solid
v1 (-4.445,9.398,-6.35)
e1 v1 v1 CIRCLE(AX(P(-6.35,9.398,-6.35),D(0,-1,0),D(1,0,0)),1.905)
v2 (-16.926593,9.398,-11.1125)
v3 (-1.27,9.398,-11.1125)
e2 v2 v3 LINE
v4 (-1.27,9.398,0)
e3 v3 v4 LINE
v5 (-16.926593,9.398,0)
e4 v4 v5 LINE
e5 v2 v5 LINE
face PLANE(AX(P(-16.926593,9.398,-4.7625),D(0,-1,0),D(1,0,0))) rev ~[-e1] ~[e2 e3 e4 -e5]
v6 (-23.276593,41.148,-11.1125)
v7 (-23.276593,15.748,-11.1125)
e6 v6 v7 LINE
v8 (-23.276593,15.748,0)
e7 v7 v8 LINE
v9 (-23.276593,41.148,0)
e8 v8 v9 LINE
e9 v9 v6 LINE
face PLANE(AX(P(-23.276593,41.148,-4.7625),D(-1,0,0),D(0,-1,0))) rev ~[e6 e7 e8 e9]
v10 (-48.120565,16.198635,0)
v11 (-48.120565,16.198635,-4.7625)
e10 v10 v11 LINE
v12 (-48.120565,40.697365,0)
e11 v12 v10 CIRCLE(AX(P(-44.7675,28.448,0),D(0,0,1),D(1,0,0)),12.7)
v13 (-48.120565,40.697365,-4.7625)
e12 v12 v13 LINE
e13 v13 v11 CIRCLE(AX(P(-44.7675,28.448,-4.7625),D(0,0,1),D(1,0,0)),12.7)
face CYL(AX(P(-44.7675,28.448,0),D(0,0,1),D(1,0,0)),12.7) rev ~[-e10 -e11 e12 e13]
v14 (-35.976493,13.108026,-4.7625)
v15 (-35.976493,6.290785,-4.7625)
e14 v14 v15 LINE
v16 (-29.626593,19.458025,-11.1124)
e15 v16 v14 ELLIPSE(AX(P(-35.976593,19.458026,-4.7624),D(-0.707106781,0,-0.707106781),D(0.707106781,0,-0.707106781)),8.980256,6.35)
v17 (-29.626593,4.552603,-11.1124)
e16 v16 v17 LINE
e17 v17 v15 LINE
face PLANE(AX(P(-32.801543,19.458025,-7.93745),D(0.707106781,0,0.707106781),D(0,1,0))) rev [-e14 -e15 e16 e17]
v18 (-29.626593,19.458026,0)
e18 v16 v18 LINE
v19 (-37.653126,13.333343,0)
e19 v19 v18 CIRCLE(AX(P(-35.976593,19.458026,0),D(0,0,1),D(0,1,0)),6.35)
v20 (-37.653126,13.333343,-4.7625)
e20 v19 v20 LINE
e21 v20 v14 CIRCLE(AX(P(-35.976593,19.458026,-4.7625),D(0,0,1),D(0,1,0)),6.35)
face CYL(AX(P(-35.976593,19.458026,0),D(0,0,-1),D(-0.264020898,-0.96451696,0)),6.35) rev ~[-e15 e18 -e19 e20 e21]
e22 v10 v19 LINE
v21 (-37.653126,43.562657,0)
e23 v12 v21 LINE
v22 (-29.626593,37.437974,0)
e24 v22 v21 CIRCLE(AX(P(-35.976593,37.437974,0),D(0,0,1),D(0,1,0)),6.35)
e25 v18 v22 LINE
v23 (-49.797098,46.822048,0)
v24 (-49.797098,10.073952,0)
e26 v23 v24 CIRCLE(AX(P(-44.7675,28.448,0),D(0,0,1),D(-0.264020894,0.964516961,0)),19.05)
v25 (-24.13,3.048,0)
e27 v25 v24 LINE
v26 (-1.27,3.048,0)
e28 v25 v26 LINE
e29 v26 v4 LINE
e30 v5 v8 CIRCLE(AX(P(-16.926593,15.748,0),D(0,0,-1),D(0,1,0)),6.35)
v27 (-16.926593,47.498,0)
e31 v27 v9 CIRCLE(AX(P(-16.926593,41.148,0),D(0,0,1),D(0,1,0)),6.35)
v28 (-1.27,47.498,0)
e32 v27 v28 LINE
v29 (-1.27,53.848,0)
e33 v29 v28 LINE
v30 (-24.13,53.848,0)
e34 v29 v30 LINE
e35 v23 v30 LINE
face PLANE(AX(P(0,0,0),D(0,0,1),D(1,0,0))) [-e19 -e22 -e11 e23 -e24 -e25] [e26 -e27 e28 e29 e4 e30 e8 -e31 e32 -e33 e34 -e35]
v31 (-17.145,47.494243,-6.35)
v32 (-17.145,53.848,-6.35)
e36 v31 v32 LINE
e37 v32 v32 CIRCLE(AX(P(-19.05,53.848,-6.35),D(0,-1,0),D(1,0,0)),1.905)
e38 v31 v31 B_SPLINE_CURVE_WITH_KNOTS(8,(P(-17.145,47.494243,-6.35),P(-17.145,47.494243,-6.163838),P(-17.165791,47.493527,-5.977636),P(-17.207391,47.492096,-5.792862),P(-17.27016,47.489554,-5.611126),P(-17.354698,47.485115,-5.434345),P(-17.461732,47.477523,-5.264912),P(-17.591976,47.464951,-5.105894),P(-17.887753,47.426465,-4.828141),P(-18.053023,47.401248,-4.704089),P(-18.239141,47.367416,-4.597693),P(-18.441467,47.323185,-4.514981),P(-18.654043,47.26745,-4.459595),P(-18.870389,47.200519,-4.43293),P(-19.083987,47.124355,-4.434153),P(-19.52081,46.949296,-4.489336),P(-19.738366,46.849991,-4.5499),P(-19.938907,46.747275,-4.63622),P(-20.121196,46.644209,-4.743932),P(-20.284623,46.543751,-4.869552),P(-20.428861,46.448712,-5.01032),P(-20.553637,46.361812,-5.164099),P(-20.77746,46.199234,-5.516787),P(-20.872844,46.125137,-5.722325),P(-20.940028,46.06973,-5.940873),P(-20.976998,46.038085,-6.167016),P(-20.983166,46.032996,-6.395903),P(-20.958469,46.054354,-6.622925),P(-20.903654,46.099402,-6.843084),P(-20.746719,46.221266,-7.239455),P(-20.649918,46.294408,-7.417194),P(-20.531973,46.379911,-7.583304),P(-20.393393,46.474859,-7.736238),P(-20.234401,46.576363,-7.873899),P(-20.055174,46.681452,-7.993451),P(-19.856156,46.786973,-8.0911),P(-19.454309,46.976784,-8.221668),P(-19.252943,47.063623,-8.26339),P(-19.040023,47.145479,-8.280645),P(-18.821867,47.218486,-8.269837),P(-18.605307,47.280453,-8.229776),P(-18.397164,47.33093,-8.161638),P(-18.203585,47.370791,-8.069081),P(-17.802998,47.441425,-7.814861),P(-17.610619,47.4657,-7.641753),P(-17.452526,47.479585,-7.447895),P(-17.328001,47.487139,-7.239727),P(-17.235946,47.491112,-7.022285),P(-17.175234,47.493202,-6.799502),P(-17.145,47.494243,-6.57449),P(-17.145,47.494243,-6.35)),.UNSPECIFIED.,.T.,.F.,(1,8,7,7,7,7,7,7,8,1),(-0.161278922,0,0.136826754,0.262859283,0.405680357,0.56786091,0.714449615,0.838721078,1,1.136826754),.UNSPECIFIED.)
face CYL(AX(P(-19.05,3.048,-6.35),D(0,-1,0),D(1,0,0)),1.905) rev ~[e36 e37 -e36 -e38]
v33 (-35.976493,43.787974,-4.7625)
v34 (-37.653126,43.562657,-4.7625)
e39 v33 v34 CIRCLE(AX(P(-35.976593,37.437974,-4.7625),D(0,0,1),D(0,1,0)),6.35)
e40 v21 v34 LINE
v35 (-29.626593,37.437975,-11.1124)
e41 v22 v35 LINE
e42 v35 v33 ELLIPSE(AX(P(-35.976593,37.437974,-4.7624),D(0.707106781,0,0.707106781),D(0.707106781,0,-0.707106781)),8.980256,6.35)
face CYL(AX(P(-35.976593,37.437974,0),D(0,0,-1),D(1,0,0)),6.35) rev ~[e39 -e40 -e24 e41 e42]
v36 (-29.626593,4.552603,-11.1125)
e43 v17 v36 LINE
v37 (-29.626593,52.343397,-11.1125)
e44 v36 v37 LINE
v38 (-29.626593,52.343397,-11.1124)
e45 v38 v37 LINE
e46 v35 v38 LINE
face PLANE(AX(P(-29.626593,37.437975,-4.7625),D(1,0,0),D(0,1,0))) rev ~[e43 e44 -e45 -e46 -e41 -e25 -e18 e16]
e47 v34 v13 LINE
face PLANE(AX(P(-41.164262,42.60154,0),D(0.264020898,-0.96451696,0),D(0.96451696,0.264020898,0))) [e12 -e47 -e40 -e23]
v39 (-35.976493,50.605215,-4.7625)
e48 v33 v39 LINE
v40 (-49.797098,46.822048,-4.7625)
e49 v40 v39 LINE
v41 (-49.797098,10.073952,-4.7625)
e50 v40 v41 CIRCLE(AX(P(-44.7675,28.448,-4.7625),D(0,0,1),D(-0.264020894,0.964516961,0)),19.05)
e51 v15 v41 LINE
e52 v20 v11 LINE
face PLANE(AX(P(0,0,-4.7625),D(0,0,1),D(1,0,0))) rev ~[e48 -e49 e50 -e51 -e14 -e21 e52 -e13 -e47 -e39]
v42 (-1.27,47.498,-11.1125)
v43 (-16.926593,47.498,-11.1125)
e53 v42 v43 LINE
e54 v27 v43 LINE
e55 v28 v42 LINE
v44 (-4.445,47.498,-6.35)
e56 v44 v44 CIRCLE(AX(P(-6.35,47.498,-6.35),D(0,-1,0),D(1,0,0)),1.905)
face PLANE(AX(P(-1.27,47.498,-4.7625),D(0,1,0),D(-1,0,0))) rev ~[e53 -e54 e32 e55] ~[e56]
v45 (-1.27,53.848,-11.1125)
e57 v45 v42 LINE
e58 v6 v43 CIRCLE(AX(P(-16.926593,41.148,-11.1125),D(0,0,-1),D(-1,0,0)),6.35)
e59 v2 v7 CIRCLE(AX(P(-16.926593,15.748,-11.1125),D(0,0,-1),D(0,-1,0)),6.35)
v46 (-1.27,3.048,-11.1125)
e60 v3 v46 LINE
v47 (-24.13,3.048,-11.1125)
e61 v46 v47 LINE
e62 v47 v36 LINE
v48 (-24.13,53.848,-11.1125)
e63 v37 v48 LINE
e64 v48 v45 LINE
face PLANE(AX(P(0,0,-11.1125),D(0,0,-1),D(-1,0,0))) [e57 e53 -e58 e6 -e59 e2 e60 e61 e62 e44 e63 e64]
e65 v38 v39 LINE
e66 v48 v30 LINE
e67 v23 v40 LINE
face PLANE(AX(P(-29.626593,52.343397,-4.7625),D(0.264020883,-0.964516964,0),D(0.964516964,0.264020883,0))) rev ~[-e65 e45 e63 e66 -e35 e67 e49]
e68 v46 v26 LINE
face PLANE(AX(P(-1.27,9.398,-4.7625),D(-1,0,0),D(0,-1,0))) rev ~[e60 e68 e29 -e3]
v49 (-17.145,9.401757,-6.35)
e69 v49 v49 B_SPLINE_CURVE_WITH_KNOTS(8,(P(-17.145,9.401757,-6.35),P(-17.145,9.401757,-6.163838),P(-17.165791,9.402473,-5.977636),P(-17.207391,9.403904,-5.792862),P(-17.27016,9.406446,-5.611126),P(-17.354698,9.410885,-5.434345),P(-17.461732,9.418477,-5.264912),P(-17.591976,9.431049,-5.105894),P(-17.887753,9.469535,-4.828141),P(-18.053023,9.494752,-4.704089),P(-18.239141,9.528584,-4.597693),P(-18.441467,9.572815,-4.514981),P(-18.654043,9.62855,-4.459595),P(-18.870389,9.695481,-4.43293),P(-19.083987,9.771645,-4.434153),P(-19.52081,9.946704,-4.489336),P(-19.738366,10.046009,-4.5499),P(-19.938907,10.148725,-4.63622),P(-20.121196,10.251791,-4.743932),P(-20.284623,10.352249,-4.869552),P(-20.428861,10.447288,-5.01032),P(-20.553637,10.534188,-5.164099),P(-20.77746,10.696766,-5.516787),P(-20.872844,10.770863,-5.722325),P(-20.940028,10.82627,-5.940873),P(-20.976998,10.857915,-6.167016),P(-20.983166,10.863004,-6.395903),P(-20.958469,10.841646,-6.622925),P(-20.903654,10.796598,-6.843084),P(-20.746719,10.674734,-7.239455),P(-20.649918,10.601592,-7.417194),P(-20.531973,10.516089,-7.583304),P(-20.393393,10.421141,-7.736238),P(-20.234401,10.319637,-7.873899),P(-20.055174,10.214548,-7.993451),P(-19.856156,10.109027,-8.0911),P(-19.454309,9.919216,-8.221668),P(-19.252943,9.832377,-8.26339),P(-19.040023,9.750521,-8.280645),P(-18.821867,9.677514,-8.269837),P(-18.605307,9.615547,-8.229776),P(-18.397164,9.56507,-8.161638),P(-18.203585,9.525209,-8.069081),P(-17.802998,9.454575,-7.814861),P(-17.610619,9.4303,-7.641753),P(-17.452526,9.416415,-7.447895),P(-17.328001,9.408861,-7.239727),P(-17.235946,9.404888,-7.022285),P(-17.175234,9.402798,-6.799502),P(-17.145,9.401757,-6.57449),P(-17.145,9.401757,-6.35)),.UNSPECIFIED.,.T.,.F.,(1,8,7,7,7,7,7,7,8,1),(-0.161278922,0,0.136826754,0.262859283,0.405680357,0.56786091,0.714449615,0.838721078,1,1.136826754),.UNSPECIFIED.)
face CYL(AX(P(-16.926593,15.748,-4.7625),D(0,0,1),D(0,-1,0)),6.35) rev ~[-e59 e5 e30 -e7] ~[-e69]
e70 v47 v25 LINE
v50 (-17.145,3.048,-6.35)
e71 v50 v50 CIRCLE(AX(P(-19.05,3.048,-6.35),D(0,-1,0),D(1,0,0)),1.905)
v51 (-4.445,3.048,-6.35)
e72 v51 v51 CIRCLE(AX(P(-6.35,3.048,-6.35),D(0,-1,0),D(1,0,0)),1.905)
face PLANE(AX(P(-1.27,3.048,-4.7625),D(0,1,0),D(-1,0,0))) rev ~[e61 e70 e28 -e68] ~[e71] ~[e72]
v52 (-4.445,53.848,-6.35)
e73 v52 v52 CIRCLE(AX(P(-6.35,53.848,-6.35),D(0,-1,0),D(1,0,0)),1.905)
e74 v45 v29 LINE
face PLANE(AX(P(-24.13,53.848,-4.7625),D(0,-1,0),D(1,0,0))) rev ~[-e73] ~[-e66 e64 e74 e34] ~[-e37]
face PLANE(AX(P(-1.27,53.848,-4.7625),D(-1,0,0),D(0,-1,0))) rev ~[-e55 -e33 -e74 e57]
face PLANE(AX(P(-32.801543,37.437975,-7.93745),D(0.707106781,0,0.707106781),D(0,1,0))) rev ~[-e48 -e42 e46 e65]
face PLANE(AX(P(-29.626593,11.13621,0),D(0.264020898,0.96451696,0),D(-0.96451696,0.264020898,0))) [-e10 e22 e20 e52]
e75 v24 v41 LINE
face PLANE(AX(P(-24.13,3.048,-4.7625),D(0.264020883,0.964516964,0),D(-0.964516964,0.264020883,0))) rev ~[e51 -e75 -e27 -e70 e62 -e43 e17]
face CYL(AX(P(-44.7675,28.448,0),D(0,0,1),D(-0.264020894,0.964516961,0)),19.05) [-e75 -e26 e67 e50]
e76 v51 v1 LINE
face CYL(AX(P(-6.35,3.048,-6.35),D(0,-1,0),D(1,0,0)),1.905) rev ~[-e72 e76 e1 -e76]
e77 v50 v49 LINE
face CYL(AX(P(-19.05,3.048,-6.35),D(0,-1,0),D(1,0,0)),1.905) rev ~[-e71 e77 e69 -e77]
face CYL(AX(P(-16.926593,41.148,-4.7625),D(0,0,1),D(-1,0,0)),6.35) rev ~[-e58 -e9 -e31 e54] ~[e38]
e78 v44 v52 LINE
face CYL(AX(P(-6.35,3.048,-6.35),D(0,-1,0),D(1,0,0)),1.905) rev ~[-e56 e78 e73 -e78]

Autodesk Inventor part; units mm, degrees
ref_plane "YZ Plane" through (0, 0, 0) normal (1, 0, 0) x (0, 1, 0)
ref_plane "XZ Plane" through (0, 0, 0) normal (0, 1, 0) x (-1, 0, 0)
ref_plane "XY Plane" through (0, 0, 0) normal (0, 0, 1) x (1, 0, 0)
sketch "Sketch2" plane through (0, 0, 0) normal (0, 0, 1) x (1, 0, 0)
  arc A0 (-42.61997, 14.00175) -> (-42.61997, 42.89425) centre (-44.7675, 28.448) ccw
  line L0 (-19.05, 53.848) -> (-6.35, 53.848)
  line L1 (-6.35, 3.048) -> (-19.05, 3.048)
  line L2 (-8.255, 3.048) -> (-4.445, 3.048)
  line L3 (-20.955, 3.048) -> (-17.145, 3.048)
  line L4 (-4.445, 53.848) -> (-8.255, 53.848)
  line L5 (-17.145, 53.848) -> (-20.955, 53.848)
  circle A1 centre (-44.7675, 28.448) radius 12.7
  arc A2 (-49.797098, 46.822048) -> (-49.797098, 10.073952) centre (-44.7675, 28.448) ccw
  line L6 (-24.13, 3.048) -> (-49.797098, 10.073952)
  line L7 (-49.797098, 46.822048) -> (-24.13, 53.848)
  line L8 (-1.27, 3.048) -> (-1.27, 9.398)
  line L9 (-1.27, 53.848) -> (-1.27, 47.498)
  line L10 (-1.27, 9.398) -> (-23.276593, 9.398)
  line L11 (-23.276593, 9.398) -> (-48.120565, 16.198635)
  line L12 (-48.120565, 40.697365) -> (-23.276593, 47.498)
  line L13 (-23.276593, 47.498) -> (-1.27, 47.498)
  line L14 (-1.27, 3.048) -> (-24.13, 3.048)
  line L15 (-24.13, 53.848) -> (-1.27, 53.848)
  line L16 (-23.276593, 9.398) -> (-23.276593, 47.498)
  line L17 (-29.626593, 11.13621) -> (-29.626593, 45.75979)
  point P0 (0, 0)
  point P1 (-12.7, 3.048)
  point P2 (-12.7, 53.848)
extrude "Extrusion1" add sketch "Sketch2" against normal blind 4.7625 contours L11 L10 L8 L14 L2 L1 L3 L6 A2 L7 L15 L5 L0 L4 L9 L13 L12 A1 | L17 L12 L16 L11
fillet "Fillet1" radius 6.35 4 edges at (-29.6266, 11.1362, -2.3813) (-29.6266, 45.7598, -2.3813) (-23.2766, 47.498, -2.3813) (-23.2766, 9.398, -2.3813)
sketch "Sketch3" plane through (0, 0, -4.7625) normal (0, 0, -1) x (-1, 0, 0)
  line L0 (1.27, 47.498) -> (16.926593, 47.498)
  arc A0 (23.276593, 41.148) -> (16.926593, 47.498) centre (16.926593, 41.148) ccw
  line L1 (23.276593, 41.148) -> (23.276593, 15.748)
  arc A1 (16.926593, 9.398) -> (23.276593, 15.748) centre (16.926593, 15.748) ccw
  line L2 (16.926593, 9.398) -> (1.27, 9.398)
  line L3 (1.27, 9.398) -> (1.27, 3.048)
  line L4 (1.27, 3.048) -> (24.13, 3.048)
  line L5 (24.13, 3.048) -> (49.797098, 10.073952)
  arc A2 (49.797098, 10.073952) -> (49.797098, 46.822048) centre (44.7675, 28.448) ccw
  line L6 (49.797098, 46.822048) -> (24.13, 53.848)
  line L7 (24.13, 53.848) -> (1.27, 53.848)
  line L8 (1.27, 53.848) -> (1.27, 47.498)
  line L9 (48.120565, 16.198635) -> (37.653126, 13.333343)
  arc A3 (29.626593, 19.458025) -> (37.653126, 13.333343) centre (35.976593, 19.458025) ccw
  line L10 (29.626593, 19.458025) -> (29.626593, 37.437975)
  arc A4 (37.653126, 43.562657) -> (29.626593, 37.437975) centre (35.976593, 37.437975) ccw
  line L11 (37.653126, 43.562657) -> (48.120565, 40.697365)
  arc A5 (48.120565, 16.198635) -> (48.120565, 40.697365) centre (44.7675, 28.448) ccw
  line L12 (29.626593, 19.458025) -> (29.626593, 4.552603)
  line L13 (29.626593, 37.437975) -> (29.626593, 52.343397)
  point P0 (0, 0)
extrude "Extrusion2" add sketch "Sketch3" along normal blind 6.35 contours L8 L7 L6 L13 L10 L12 L5 L4 L3 L2 A1 L1 A0 L0
chamfer "Chamfer1" distance 6.35 angle 45 2 edges at (-29.6266, 44.8907, -4.7625) (-29.6266, 12.0053, -4.7625)
sketch "Sketch4" plane through (-24.13, 3.048, 0) normal (0, -1, 0) x (1, 0, 0)
  circle A0 centre (17.78, -6.35) radius 1.905 projected
  circle A1 centre (5.08, -6.35) radius 1.905 projected
  point P0 (24.13, 0)
extrude "Extrusion3" cut sketch "Sketch4" against normal through all
properties part number "Lower Guide_3DPrint"
